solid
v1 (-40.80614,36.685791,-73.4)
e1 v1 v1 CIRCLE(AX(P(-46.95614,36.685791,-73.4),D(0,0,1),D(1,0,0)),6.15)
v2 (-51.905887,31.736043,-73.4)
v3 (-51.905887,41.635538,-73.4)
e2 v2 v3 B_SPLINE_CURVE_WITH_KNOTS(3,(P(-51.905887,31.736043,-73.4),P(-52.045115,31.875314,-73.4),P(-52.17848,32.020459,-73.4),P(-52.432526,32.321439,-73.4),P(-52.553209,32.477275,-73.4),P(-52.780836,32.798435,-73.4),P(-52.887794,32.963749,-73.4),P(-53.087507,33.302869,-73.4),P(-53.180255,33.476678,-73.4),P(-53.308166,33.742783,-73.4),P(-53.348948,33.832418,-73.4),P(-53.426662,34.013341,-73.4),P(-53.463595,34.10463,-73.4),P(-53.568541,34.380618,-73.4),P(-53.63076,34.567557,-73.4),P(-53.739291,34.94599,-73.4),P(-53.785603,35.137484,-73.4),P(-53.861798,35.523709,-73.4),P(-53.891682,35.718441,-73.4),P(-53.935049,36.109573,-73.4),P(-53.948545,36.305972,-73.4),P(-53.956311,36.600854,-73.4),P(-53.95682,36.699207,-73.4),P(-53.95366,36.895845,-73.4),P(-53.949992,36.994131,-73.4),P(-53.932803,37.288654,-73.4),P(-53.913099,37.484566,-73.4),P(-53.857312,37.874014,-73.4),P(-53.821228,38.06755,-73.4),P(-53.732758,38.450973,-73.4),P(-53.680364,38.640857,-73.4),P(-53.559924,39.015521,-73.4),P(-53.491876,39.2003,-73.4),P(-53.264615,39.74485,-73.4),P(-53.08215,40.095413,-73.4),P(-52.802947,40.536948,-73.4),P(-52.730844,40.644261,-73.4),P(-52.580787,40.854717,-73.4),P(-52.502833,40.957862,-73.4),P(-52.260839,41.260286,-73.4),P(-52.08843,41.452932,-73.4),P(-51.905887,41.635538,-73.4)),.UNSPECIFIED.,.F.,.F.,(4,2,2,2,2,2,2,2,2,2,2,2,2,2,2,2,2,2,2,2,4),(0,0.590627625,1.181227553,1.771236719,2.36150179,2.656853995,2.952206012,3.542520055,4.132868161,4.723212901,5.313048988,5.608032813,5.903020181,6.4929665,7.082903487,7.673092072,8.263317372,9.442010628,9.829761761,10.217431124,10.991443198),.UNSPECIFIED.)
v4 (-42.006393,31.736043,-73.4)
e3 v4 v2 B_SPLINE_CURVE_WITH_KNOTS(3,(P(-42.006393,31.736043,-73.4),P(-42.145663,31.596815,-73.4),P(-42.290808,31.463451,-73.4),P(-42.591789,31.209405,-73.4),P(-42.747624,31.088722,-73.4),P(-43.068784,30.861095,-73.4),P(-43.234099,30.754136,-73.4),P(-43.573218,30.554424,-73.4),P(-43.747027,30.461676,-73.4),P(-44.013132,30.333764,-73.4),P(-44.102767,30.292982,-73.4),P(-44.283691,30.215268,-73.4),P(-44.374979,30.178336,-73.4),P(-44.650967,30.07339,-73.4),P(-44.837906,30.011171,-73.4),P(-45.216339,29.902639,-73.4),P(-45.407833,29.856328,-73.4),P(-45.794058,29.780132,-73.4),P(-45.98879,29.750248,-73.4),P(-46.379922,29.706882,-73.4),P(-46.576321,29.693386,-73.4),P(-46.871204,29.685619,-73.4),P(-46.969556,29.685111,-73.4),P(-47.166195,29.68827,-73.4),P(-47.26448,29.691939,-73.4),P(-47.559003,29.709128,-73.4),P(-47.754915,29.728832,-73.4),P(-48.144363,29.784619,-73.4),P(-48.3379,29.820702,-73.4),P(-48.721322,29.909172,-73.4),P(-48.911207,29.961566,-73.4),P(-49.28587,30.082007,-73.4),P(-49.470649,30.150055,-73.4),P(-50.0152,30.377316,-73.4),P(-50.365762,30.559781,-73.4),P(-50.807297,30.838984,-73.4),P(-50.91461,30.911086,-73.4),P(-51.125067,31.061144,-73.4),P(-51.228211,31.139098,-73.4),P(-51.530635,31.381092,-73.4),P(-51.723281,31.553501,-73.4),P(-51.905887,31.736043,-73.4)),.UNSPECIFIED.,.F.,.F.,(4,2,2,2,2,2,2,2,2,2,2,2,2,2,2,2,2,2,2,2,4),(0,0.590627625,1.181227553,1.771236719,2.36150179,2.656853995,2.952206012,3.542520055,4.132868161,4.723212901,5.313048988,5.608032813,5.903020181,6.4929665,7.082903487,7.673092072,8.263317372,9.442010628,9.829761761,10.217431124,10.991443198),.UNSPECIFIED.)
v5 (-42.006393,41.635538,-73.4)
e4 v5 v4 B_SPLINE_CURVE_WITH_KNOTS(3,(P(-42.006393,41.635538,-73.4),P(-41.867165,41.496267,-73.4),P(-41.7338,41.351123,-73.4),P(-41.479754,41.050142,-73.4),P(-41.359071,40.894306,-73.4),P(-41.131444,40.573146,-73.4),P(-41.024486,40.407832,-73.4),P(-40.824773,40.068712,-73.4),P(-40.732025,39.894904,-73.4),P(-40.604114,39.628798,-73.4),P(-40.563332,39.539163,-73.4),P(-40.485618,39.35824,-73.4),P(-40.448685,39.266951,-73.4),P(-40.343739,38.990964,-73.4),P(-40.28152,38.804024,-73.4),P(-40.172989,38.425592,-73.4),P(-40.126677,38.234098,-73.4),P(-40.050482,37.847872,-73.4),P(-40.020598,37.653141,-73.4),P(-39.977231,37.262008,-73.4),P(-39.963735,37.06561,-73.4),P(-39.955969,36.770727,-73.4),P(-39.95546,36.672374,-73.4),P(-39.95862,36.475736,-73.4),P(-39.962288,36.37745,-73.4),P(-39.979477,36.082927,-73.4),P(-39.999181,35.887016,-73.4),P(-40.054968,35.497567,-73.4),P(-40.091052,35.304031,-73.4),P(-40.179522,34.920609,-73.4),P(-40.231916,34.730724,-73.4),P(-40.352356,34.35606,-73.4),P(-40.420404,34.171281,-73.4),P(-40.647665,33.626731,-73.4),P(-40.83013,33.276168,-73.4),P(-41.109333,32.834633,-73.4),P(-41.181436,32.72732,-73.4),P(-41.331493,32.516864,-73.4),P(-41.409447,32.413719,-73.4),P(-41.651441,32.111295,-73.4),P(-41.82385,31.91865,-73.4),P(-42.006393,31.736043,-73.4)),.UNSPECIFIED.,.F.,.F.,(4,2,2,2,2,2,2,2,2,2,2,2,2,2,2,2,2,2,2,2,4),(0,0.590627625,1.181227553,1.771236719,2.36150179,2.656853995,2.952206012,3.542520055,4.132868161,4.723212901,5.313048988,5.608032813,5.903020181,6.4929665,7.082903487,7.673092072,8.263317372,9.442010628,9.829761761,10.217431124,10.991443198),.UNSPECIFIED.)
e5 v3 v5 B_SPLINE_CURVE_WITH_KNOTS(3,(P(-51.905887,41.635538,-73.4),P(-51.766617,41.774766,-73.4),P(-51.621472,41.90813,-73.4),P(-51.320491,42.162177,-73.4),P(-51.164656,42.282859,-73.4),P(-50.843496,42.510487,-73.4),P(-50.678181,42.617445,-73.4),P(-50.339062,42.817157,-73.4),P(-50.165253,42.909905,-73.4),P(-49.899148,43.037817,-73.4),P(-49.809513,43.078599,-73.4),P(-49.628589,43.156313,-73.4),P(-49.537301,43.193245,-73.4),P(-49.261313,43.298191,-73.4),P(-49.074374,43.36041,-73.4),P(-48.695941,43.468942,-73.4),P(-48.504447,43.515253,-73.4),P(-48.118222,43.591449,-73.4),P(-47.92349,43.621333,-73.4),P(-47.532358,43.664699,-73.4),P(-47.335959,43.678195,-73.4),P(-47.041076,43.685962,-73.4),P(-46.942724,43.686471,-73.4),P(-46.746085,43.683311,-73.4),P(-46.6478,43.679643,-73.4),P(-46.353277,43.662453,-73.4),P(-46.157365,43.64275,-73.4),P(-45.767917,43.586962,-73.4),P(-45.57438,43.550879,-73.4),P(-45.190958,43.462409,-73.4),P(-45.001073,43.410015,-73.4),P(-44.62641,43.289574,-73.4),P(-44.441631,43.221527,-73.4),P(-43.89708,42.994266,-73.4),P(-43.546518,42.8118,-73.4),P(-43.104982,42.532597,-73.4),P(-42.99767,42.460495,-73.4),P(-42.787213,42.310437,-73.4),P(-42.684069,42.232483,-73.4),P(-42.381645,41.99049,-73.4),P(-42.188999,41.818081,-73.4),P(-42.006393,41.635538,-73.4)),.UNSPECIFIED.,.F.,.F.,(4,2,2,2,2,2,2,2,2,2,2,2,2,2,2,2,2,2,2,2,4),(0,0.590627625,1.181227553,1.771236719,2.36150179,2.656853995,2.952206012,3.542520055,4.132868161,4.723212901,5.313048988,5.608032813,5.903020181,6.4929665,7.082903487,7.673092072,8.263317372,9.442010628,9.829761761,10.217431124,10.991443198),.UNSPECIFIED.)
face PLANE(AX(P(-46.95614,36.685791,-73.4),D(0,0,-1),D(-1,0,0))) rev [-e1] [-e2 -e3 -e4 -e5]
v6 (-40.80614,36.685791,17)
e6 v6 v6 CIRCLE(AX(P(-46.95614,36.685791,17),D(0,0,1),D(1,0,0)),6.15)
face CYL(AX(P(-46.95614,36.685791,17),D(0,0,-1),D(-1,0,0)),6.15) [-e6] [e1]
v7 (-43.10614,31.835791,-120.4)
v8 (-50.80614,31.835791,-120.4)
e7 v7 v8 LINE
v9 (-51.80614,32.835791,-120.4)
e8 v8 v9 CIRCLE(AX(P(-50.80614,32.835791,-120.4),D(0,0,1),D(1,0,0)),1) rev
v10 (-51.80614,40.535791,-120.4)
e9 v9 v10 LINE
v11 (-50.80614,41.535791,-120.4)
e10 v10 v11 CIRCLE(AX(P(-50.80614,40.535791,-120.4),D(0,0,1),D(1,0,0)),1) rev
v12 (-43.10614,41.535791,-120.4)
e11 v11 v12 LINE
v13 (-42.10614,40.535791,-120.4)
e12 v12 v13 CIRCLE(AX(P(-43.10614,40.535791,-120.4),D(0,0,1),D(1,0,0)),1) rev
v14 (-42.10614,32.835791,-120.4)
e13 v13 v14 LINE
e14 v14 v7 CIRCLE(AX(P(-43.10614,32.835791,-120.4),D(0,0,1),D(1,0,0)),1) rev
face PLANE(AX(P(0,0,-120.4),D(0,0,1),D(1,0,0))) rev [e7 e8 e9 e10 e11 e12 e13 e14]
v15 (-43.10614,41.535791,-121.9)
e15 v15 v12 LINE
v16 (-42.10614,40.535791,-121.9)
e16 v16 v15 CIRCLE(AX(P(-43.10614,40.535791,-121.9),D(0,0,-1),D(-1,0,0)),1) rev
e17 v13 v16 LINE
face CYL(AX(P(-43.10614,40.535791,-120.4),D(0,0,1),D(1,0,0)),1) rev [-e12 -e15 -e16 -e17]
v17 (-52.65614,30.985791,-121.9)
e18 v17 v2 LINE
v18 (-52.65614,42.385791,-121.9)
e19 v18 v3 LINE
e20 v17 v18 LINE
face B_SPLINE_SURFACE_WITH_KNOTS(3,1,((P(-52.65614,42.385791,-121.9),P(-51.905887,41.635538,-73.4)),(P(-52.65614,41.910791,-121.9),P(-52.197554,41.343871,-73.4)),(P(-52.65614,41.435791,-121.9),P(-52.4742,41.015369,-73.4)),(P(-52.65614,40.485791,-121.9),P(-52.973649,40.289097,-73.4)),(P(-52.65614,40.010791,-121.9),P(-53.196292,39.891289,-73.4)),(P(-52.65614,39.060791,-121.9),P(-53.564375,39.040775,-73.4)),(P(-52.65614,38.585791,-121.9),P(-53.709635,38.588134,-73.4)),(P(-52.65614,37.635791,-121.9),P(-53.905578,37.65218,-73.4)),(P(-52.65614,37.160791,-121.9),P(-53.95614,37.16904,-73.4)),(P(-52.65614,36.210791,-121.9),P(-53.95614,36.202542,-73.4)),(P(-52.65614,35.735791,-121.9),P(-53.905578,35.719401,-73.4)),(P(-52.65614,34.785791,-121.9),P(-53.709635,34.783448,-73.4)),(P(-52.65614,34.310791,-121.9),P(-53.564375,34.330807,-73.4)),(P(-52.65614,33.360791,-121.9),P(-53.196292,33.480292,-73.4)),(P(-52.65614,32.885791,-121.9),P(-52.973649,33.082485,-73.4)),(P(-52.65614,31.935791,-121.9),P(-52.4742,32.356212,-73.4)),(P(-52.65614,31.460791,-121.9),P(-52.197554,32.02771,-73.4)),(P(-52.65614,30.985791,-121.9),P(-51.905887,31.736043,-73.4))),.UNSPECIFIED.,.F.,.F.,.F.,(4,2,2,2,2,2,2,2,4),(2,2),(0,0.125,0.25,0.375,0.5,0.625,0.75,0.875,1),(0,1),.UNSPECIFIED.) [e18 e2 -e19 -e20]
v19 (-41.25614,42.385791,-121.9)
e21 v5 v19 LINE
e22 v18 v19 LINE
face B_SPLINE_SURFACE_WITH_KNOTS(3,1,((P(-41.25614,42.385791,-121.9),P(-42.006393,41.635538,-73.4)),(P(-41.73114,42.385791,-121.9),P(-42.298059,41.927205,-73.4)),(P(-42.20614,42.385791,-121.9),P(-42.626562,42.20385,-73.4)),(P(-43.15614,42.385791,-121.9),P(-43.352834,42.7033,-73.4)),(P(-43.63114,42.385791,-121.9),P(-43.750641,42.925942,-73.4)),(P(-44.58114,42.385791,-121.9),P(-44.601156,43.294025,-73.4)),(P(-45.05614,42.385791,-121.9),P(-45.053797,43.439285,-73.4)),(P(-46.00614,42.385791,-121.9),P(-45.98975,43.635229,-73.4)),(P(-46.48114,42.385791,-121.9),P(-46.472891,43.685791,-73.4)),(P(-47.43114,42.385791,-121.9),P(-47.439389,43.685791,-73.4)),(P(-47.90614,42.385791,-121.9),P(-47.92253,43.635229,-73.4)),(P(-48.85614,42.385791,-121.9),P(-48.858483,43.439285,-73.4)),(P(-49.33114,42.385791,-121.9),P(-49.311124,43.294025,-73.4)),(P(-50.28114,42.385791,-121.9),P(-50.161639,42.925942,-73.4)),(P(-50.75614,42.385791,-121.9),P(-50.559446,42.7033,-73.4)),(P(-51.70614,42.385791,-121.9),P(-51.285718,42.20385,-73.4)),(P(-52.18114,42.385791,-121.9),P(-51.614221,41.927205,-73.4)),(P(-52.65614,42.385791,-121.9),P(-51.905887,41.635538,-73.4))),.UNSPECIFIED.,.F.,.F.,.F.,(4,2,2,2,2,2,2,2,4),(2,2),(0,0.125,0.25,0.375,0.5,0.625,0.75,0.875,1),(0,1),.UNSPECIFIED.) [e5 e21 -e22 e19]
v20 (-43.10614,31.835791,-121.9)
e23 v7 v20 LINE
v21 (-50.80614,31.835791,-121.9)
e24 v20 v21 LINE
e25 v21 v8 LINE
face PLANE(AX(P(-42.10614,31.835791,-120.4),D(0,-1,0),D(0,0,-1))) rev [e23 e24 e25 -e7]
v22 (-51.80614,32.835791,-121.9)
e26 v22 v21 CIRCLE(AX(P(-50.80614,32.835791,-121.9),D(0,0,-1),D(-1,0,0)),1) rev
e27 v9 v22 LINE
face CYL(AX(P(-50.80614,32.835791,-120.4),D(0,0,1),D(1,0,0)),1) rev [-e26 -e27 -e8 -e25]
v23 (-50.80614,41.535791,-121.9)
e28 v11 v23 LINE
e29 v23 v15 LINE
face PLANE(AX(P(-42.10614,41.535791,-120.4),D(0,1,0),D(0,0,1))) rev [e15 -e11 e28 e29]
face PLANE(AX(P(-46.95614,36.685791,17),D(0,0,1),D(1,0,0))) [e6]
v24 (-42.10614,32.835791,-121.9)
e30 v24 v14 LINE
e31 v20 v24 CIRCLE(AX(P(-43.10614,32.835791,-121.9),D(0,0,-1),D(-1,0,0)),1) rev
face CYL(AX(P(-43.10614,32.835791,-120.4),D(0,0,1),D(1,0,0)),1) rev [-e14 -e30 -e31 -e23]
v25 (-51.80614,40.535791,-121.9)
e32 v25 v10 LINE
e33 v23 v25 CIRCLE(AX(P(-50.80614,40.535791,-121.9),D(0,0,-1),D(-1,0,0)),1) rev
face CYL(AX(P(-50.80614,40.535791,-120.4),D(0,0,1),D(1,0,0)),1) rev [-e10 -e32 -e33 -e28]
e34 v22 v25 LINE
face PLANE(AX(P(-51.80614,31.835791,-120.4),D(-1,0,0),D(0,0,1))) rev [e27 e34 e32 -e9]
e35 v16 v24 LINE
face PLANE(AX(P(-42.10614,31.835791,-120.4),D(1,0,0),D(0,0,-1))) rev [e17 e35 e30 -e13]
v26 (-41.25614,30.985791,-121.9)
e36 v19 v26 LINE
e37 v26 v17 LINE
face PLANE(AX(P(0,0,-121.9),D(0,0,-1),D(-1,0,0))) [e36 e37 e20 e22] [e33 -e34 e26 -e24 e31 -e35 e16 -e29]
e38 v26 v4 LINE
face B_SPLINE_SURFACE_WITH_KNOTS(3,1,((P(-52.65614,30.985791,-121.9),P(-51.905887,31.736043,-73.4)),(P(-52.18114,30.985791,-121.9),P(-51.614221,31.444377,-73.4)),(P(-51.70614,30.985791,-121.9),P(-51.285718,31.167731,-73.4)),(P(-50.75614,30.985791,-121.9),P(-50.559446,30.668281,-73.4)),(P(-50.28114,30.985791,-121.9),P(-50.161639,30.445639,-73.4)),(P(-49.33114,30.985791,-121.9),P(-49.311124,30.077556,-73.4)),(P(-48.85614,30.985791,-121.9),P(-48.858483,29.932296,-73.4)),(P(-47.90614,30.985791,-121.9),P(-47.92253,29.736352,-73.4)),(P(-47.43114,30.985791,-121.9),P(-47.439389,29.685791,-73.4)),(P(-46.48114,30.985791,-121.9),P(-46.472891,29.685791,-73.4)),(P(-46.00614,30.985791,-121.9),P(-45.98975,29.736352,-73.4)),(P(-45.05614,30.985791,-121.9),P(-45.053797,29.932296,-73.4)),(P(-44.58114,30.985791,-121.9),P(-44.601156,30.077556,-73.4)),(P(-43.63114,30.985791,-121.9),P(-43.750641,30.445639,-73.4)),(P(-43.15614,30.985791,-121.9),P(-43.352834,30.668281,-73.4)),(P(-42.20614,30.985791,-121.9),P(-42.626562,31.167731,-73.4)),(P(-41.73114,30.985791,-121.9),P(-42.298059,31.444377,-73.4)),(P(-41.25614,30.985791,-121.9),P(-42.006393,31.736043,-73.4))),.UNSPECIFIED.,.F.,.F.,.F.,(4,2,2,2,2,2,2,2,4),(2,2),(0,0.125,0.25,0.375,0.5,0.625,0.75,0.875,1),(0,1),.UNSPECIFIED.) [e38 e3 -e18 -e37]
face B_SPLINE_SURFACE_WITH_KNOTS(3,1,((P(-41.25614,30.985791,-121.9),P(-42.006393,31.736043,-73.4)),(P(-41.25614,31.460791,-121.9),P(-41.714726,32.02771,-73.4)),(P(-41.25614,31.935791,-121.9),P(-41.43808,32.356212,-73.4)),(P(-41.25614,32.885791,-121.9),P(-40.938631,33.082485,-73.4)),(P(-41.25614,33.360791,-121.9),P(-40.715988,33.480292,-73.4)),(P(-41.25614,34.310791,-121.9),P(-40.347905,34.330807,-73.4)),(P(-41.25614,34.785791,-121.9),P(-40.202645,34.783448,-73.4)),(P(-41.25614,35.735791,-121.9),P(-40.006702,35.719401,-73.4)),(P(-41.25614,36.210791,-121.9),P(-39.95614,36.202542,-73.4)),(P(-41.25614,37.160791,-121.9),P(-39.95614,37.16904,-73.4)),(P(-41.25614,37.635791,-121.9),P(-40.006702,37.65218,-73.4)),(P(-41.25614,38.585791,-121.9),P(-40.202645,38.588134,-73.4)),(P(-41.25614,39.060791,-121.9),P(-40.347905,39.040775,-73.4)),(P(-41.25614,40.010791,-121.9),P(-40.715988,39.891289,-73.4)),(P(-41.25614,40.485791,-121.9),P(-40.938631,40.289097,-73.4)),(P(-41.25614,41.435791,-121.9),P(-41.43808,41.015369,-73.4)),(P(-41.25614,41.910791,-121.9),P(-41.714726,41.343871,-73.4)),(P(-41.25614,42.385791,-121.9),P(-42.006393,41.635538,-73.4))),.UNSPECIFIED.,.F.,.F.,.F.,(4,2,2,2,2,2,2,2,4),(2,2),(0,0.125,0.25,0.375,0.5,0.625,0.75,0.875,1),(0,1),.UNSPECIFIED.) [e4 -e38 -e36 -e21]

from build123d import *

# Parameters (mm, degrees)
SKETCH1_R           = 6.15
BOSS_EXTRUDE1_DEPTH = 17
BOSS_EXTRUDE2_START = -73.4
SKETCH1_2_R         = 6.15
BOSS_EXTRUDE2_DEPTH = 73.4
SKETCH4_W           = 9.7
SKETCH4_H           = 9.7
CUT_EXTRUDE1_DEPTH  = 1.5
FILLET1_R           = 1


with BuildPart() as part:
    # Sketch1 → Boss-Extrude1 (new body)
    with BuildSketch(Plane.XY):
        with Locations((-46.956139987, 36.685790659)):
            Circle(SKETCH1_R)
    extrude(amount=BOSS_EXTRUDE1_DEPTH)

    # Sketch1<2> → Boss-Extrude2 (add)
    with BuildSketch(Plane.XY.offset(BOSS_EXTRUDE2_START)):
        with Locations((-46.956139987, 36.685790659)):
            Circle(SKETCH1_2_R)
    extrude(amount=BOSS_EXTRUDE2_DEPTH)

    # Sketch3 → Loft1 section 0
    with BuildSketch(Plane(origin=(0, 0, -121.9), x_dir=(-1, 0, 0), z_dir=(0, 0, -1))):
        with BuildLine():
            Line((41.256139987, 42.385790659), (52.656139987, 42.385790659))
            Line((52.656139987, 42.385790659), (52.656139987, 30.985790659))
            Line((52.656139987, 30.985790659), (41.256139987, 30.985790659))
            Line((41.256139987, 30.985790659), (41.256139987, 42.385790659))
        make_face()
    # Sketch2 for Loft1 → Loft1 section 1
    with BuildSketch(Plane(origin=(0, 0, -73.4), x_dir=(-1, 0, 0), z_dir=(0, 0, -1))):
        with BuildLine():
            # circular arc as an exact rational Bezier (weights 1, cos(half-angle), 1)
            Bezier((42.006392519, 41.635538128), (46.956139988, 46.585285594), (51.905887456, 41.635538128), weights=[1, 0.707106781, 1])
            Bezier((51.905887456, 41.635538128), (56.855634922, 36.68579066), (51.905887456, 31.736043191), weights=[1, 0.707106781, 1])
            Bezier((51.905887456, 31.736043191), (46.956139987, 26.786295722), (42.006392519, 31.736043191), weights=[1, 0.707106781, 1])
            Bezier((42.006392519, 31.736043191), (37.05664505, 36.685790659), (42.006392519, 41.635538128), weights=[1, 0.707106781, 1])
        make_face()
    loft()

    # Sketch4 → Cut-Extrude1 (cut)
    with BuildSketch(Plane(origin=(0, 0, -121.9), x_dir=(-1, 0, 0), z_dir=(0, 0, -1))):
        with Locations((46.956139987, 36.685790659)):
            Rectangle(SKETCH4_W, SKETCH4_H)
    extrude(amount=-CUT_EXTRUDE1_DEPTH, mode=Mode.SUBTRACT)

    # Fillet1
    fillet1_edges = [part.edges().sort_by_distance(p)[0] for p in [
        (-51.806139987, 41.535790659, -121.15),
        (-51.806139987, 31.835790659, -121.15),
        (-42.106139987, 31.835790659, -121.15),
        (-42.106139987, 41.535790659, -121.15),
    ]]
    fillet(fillet1_edges, radius=FILLET1_R)


solid = part.part
